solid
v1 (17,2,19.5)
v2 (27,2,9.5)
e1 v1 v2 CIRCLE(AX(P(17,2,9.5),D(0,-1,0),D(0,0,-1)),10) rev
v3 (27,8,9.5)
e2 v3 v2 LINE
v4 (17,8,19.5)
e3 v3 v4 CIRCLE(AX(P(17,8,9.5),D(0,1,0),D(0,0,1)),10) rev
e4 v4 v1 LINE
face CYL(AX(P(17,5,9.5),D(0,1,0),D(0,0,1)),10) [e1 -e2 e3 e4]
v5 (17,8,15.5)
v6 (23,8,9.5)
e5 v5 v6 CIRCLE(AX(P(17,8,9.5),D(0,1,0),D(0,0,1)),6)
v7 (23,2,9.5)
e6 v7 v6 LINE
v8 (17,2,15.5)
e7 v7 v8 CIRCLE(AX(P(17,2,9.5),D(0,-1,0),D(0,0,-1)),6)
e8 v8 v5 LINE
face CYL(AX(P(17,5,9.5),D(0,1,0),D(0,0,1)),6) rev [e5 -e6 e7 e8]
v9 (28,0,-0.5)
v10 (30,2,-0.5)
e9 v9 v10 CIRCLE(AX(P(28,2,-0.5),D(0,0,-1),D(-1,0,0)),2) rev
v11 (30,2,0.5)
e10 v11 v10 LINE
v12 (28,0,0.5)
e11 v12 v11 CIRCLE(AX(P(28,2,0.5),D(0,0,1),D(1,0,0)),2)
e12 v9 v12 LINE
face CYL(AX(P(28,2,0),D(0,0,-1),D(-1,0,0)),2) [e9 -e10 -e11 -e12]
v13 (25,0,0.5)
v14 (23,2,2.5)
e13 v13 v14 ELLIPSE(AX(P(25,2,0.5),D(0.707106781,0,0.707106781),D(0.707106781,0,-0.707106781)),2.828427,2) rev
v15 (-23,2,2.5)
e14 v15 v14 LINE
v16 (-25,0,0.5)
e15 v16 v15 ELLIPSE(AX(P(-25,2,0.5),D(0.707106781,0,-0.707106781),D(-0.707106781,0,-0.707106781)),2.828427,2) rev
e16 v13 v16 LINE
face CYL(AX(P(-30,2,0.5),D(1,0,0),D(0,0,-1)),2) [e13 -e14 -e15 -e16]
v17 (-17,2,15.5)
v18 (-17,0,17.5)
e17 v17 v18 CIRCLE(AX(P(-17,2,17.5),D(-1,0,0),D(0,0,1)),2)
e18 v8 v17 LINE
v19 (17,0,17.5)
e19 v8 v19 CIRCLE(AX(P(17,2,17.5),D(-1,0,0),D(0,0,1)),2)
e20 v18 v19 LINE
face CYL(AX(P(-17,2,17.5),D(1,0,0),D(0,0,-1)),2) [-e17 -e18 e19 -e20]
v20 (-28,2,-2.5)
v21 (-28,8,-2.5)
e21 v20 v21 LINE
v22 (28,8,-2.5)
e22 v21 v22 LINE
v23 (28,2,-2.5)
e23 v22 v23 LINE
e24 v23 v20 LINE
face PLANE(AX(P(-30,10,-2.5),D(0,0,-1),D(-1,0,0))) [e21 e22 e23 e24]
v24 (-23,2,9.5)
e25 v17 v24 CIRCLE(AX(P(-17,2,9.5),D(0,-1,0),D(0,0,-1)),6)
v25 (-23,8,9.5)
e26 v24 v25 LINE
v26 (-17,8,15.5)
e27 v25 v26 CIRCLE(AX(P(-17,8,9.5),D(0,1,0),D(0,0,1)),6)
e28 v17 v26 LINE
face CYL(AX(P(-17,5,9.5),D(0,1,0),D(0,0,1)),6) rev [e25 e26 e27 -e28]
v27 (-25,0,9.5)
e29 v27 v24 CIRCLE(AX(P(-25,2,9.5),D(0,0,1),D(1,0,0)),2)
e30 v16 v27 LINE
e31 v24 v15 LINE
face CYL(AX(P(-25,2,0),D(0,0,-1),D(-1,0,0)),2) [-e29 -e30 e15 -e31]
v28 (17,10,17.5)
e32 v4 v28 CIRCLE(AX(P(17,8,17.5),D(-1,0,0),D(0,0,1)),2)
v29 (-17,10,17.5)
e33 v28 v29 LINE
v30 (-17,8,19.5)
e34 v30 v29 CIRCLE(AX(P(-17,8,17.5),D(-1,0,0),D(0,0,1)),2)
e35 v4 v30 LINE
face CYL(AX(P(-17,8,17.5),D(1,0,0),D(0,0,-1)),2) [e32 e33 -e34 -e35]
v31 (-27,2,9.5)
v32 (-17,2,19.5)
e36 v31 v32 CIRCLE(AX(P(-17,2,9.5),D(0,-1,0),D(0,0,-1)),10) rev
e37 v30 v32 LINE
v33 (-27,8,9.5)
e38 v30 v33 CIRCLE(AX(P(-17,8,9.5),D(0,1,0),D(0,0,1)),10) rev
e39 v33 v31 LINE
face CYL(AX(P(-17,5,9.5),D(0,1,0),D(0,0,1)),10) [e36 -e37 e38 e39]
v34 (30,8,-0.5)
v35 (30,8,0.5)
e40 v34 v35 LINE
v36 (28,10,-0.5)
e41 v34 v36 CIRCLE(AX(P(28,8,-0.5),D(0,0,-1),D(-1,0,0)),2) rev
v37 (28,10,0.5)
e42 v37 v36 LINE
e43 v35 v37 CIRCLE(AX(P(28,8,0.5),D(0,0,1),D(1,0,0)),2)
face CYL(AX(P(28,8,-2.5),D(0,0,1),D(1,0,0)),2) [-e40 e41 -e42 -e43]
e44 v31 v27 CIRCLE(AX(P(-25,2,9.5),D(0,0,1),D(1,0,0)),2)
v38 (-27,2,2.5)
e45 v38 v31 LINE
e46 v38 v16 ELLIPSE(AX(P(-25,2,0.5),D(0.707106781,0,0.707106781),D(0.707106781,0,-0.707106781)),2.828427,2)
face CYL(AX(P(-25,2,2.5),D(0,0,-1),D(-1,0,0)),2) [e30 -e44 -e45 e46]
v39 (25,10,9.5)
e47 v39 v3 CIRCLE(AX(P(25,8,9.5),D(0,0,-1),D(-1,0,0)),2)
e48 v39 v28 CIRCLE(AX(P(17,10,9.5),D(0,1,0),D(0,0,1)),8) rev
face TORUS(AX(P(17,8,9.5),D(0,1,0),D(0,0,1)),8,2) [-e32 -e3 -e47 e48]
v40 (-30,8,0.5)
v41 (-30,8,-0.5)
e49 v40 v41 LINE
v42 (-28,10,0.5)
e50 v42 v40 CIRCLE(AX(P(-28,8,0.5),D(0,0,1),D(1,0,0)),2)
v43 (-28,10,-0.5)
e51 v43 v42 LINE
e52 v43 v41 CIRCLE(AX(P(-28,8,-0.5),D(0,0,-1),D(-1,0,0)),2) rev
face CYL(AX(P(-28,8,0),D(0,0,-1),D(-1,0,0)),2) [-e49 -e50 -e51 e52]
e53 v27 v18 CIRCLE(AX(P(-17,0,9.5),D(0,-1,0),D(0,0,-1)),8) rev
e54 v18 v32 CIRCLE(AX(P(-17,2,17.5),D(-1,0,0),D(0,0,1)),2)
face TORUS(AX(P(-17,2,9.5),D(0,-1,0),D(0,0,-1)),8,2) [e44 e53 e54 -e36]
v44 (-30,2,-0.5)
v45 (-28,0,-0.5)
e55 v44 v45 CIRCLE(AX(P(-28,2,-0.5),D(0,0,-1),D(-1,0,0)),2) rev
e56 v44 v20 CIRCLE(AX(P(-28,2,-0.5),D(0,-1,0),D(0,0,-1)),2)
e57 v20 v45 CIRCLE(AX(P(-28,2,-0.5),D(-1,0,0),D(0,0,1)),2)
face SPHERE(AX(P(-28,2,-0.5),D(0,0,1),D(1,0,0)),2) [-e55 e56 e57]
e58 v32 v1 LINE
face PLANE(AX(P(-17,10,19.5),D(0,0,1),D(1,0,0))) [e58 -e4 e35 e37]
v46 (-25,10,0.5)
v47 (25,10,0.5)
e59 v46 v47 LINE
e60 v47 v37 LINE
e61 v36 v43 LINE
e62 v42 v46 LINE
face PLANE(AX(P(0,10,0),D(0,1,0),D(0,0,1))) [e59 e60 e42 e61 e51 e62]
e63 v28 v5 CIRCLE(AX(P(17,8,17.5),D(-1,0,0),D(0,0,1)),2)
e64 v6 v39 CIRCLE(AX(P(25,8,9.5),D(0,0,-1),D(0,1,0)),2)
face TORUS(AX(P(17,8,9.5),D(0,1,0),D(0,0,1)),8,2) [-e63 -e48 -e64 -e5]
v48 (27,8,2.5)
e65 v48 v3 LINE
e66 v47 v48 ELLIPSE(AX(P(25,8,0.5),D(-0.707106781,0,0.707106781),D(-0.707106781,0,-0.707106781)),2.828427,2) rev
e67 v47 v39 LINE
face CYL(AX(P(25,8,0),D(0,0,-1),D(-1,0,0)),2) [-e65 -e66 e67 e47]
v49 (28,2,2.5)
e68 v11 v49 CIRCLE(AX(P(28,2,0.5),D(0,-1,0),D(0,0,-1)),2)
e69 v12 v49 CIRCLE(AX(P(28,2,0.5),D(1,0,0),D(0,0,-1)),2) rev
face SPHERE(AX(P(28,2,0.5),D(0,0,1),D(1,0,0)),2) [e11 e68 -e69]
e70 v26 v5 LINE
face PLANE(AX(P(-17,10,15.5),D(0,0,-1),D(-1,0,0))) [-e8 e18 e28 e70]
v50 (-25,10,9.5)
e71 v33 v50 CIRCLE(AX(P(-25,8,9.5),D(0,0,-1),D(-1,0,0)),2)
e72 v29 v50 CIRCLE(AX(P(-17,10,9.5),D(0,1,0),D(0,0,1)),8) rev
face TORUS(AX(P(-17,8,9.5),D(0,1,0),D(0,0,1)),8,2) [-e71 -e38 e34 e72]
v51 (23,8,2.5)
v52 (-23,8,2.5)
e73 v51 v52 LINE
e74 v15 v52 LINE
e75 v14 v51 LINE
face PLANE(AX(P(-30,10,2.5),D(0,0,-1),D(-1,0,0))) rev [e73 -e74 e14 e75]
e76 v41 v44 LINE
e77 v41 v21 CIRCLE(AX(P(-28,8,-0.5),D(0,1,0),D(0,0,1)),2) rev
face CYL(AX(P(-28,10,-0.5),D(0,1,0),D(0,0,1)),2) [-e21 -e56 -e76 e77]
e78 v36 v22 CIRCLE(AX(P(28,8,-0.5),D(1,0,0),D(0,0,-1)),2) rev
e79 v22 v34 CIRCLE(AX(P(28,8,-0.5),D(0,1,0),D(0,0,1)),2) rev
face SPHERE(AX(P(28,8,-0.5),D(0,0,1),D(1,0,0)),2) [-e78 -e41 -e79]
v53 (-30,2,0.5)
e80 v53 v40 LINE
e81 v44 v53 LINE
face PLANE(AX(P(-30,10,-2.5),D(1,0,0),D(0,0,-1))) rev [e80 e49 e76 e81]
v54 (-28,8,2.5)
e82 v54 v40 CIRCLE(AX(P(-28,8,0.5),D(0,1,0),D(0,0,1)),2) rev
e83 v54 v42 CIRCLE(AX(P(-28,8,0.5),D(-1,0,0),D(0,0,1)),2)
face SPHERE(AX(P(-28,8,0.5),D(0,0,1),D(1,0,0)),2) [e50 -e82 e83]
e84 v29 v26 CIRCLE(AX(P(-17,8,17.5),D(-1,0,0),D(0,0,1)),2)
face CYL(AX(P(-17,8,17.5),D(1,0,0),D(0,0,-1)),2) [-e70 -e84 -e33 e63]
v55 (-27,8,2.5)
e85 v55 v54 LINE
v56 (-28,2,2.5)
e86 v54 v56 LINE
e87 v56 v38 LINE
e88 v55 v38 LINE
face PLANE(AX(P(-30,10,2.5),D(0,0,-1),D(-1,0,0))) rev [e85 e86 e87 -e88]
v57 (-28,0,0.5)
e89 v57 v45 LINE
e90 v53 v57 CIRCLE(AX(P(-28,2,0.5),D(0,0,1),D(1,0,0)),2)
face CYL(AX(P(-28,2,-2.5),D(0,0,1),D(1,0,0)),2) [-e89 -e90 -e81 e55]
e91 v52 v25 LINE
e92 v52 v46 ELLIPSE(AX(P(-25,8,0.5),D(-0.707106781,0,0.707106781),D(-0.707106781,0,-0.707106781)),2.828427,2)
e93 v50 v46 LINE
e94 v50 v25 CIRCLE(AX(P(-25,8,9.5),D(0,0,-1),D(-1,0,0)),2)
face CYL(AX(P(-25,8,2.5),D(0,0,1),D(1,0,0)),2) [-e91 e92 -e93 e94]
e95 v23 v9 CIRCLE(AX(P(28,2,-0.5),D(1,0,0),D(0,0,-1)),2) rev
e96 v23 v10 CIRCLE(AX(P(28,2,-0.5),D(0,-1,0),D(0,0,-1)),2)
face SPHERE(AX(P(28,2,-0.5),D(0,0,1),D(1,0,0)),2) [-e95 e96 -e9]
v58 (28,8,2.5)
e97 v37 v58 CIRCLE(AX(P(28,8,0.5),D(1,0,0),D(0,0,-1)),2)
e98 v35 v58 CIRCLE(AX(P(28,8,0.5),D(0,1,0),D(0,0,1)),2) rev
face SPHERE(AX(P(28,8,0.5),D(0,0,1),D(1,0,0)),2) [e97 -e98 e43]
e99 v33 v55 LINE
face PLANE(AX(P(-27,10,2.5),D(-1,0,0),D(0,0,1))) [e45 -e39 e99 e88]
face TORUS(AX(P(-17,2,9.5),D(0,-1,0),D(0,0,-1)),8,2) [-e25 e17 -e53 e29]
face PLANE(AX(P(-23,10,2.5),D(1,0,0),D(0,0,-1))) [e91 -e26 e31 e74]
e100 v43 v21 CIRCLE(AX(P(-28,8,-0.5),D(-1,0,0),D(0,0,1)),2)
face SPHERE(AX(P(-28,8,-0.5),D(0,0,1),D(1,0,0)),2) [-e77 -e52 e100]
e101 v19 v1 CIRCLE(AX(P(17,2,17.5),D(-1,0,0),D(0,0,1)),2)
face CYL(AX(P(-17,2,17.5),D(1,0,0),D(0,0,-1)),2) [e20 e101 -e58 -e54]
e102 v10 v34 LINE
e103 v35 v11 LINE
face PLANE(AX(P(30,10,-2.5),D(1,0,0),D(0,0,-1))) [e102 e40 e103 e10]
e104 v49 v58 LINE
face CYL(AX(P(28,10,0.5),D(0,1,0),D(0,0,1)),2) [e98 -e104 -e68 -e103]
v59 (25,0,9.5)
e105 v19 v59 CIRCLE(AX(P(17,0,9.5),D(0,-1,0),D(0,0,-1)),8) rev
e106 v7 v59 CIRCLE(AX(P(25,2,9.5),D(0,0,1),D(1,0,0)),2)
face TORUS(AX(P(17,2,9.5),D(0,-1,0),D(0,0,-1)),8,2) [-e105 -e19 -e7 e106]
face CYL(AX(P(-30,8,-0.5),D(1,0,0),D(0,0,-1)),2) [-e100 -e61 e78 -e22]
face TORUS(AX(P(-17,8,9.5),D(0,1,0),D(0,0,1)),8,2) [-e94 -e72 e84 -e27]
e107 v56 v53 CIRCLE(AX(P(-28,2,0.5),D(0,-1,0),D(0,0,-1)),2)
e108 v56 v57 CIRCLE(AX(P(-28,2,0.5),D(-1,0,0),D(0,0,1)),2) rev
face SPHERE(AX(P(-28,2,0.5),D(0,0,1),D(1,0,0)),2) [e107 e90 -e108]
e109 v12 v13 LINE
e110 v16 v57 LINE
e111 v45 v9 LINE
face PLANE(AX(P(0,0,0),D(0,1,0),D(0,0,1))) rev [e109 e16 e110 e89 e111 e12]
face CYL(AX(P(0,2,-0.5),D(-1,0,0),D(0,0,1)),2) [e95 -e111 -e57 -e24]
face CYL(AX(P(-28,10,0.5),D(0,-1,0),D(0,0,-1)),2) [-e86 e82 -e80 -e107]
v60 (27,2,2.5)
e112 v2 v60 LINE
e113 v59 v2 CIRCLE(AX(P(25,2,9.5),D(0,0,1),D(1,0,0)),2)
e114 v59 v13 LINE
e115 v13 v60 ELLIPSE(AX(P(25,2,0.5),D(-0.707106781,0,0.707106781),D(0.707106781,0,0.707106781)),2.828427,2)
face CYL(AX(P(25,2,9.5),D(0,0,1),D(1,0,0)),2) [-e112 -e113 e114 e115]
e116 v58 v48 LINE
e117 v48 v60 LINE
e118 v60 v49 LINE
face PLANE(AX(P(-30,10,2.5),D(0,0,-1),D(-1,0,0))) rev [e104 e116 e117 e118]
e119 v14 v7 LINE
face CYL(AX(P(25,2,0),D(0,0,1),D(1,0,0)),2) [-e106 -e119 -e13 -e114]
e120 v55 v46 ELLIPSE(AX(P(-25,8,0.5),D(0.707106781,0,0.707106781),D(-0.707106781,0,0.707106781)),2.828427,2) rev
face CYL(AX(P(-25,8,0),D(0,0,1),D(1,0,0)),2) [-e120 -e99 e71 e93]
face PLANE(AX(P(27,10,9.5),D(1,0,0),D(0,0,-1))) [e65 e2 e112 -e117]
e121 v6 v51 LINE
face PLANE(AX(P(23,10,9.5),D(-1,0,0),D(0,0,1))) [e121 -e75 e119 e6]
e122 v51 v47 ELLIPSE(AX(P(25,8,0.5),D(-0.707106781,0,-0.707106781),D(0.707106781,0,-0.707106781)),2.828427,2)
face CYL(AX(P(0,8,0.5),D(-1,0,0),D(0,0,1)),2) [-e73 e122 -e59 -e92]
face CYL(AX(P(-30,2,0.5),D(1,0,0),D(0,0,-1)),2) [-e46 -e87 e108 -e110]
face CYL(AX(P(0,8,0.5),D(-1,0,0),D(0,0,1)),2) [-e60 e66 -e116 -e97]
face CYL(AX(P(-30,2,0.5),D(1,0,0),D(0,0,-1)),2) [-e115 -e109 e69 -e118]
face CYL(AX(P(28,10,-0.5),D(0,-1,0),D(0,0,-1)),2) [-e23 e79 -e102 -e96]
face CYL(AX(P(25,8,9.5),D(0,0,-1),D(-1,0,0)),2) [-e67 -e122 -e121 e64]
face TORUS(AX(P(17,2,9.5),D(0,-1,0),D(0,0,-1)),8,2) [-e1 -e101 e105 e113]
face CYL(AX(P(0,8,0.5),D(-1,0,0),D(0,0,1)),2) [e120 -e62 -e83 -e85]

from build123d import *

# Parameters (mm, degrees)
SKETCH1_W           = 60
SKETCH1_H           = 5
BOSS_EXTRUDE1_DEPTH = 10
SKETCH2_W           = 4
SKETCH2_H           = 10
FILLET1_R           = 2


with BuildPart() as part:
    # Sketch1 → Boss-Extrude1 (new body)
    with BuildSketch(Plane(origin=(0, 0, 0), x_dir=(1, 0, 0), z_dir=(0, 1, 0))):
        Rectangle(SKETCH1_W, SKETCH1_H)
    extrude(amount=BOSS_EXTRUDE1_DEPTH)

    # Sweep6: sweep along a curve in space
    with BuildLine() as sweep6_path:
        Line((-25, 5, 2.5), (-25, 5, 9.5))
        ThreePointArc((-25, 5, 9.5), (-22.656854249, 5, 15.156854249), (-17, 5, 17.5))
        Line((-17, 5, 17.5), (17, 5, 17.5))
        ThreePointArc((17, 5, 17.5), (22.656854249, 5, 15.156854249), (25, 5, 9.5))
        Line((25, 5, 2.5), (25, 5, 9.5))
    # Sketch2 → Sweep6 (sweep)
    with BuildSketch(Plane.XY.offset(2.5)):
        with Locations((-25, 5)):
            Rectangle(SKETCH2_W, SKETCH2_H)
    sweep(path=sweep6_path.line)

    # Fillet1
    fillet1_edges = [part.edges().sort_by_distance(p)[0] for p in [
        (-21.242640687, 0, 13.742640687),
        (0, 0, 15.5),
        (21.242640687, 0, 13.742640687),
        (-24.071067812, 0, 16.571067812),
        (0, 0, 19.5),
        (24.071067812, 0, 16.571067812),
        (-28.5, 0, 2.5),
        (-27, 0, 6),
        (-27, 10, 6),
        (-23, 0, 6),
        (0, 0, 2.5),
        (23, 0, 6),
        (27, 0, 6),
        (27, 10, 6),
        (28.5, 0, 2.5),
        (30, 0, 0),
        (0, 0, -2.5),
        (-30, 0, 0),
        (-24.071067812, 10, 16.571067812),
        (24.071067812, 10, 16.571067812),
        (-21.242640687, 10, 13.742640687),
        (21.242640687, 10, 13.742640687),
        (-30, 5, -2.5),
        (-30, 5, 2.5),
        (30, 5, 2.5),
        (30, 5, -2.5),
        (0, 10, -2.5),
        (30, 10, 0),
        (28.5, 10, 2.5),
        (23, 10, 6),
        (0, 10, 2.5),
        (-23, 10, 6),
        (-28.5, 10, 2.5),
        (-30, 10, 0),
        (0, 10, 19.5),
        (0, 10, 15.5),
    ]]
    fillet(fillet1_edges, radius=FILLET1_R - 0.0001)  # a hair under: the kernel refuses the full size


solid = part.part
